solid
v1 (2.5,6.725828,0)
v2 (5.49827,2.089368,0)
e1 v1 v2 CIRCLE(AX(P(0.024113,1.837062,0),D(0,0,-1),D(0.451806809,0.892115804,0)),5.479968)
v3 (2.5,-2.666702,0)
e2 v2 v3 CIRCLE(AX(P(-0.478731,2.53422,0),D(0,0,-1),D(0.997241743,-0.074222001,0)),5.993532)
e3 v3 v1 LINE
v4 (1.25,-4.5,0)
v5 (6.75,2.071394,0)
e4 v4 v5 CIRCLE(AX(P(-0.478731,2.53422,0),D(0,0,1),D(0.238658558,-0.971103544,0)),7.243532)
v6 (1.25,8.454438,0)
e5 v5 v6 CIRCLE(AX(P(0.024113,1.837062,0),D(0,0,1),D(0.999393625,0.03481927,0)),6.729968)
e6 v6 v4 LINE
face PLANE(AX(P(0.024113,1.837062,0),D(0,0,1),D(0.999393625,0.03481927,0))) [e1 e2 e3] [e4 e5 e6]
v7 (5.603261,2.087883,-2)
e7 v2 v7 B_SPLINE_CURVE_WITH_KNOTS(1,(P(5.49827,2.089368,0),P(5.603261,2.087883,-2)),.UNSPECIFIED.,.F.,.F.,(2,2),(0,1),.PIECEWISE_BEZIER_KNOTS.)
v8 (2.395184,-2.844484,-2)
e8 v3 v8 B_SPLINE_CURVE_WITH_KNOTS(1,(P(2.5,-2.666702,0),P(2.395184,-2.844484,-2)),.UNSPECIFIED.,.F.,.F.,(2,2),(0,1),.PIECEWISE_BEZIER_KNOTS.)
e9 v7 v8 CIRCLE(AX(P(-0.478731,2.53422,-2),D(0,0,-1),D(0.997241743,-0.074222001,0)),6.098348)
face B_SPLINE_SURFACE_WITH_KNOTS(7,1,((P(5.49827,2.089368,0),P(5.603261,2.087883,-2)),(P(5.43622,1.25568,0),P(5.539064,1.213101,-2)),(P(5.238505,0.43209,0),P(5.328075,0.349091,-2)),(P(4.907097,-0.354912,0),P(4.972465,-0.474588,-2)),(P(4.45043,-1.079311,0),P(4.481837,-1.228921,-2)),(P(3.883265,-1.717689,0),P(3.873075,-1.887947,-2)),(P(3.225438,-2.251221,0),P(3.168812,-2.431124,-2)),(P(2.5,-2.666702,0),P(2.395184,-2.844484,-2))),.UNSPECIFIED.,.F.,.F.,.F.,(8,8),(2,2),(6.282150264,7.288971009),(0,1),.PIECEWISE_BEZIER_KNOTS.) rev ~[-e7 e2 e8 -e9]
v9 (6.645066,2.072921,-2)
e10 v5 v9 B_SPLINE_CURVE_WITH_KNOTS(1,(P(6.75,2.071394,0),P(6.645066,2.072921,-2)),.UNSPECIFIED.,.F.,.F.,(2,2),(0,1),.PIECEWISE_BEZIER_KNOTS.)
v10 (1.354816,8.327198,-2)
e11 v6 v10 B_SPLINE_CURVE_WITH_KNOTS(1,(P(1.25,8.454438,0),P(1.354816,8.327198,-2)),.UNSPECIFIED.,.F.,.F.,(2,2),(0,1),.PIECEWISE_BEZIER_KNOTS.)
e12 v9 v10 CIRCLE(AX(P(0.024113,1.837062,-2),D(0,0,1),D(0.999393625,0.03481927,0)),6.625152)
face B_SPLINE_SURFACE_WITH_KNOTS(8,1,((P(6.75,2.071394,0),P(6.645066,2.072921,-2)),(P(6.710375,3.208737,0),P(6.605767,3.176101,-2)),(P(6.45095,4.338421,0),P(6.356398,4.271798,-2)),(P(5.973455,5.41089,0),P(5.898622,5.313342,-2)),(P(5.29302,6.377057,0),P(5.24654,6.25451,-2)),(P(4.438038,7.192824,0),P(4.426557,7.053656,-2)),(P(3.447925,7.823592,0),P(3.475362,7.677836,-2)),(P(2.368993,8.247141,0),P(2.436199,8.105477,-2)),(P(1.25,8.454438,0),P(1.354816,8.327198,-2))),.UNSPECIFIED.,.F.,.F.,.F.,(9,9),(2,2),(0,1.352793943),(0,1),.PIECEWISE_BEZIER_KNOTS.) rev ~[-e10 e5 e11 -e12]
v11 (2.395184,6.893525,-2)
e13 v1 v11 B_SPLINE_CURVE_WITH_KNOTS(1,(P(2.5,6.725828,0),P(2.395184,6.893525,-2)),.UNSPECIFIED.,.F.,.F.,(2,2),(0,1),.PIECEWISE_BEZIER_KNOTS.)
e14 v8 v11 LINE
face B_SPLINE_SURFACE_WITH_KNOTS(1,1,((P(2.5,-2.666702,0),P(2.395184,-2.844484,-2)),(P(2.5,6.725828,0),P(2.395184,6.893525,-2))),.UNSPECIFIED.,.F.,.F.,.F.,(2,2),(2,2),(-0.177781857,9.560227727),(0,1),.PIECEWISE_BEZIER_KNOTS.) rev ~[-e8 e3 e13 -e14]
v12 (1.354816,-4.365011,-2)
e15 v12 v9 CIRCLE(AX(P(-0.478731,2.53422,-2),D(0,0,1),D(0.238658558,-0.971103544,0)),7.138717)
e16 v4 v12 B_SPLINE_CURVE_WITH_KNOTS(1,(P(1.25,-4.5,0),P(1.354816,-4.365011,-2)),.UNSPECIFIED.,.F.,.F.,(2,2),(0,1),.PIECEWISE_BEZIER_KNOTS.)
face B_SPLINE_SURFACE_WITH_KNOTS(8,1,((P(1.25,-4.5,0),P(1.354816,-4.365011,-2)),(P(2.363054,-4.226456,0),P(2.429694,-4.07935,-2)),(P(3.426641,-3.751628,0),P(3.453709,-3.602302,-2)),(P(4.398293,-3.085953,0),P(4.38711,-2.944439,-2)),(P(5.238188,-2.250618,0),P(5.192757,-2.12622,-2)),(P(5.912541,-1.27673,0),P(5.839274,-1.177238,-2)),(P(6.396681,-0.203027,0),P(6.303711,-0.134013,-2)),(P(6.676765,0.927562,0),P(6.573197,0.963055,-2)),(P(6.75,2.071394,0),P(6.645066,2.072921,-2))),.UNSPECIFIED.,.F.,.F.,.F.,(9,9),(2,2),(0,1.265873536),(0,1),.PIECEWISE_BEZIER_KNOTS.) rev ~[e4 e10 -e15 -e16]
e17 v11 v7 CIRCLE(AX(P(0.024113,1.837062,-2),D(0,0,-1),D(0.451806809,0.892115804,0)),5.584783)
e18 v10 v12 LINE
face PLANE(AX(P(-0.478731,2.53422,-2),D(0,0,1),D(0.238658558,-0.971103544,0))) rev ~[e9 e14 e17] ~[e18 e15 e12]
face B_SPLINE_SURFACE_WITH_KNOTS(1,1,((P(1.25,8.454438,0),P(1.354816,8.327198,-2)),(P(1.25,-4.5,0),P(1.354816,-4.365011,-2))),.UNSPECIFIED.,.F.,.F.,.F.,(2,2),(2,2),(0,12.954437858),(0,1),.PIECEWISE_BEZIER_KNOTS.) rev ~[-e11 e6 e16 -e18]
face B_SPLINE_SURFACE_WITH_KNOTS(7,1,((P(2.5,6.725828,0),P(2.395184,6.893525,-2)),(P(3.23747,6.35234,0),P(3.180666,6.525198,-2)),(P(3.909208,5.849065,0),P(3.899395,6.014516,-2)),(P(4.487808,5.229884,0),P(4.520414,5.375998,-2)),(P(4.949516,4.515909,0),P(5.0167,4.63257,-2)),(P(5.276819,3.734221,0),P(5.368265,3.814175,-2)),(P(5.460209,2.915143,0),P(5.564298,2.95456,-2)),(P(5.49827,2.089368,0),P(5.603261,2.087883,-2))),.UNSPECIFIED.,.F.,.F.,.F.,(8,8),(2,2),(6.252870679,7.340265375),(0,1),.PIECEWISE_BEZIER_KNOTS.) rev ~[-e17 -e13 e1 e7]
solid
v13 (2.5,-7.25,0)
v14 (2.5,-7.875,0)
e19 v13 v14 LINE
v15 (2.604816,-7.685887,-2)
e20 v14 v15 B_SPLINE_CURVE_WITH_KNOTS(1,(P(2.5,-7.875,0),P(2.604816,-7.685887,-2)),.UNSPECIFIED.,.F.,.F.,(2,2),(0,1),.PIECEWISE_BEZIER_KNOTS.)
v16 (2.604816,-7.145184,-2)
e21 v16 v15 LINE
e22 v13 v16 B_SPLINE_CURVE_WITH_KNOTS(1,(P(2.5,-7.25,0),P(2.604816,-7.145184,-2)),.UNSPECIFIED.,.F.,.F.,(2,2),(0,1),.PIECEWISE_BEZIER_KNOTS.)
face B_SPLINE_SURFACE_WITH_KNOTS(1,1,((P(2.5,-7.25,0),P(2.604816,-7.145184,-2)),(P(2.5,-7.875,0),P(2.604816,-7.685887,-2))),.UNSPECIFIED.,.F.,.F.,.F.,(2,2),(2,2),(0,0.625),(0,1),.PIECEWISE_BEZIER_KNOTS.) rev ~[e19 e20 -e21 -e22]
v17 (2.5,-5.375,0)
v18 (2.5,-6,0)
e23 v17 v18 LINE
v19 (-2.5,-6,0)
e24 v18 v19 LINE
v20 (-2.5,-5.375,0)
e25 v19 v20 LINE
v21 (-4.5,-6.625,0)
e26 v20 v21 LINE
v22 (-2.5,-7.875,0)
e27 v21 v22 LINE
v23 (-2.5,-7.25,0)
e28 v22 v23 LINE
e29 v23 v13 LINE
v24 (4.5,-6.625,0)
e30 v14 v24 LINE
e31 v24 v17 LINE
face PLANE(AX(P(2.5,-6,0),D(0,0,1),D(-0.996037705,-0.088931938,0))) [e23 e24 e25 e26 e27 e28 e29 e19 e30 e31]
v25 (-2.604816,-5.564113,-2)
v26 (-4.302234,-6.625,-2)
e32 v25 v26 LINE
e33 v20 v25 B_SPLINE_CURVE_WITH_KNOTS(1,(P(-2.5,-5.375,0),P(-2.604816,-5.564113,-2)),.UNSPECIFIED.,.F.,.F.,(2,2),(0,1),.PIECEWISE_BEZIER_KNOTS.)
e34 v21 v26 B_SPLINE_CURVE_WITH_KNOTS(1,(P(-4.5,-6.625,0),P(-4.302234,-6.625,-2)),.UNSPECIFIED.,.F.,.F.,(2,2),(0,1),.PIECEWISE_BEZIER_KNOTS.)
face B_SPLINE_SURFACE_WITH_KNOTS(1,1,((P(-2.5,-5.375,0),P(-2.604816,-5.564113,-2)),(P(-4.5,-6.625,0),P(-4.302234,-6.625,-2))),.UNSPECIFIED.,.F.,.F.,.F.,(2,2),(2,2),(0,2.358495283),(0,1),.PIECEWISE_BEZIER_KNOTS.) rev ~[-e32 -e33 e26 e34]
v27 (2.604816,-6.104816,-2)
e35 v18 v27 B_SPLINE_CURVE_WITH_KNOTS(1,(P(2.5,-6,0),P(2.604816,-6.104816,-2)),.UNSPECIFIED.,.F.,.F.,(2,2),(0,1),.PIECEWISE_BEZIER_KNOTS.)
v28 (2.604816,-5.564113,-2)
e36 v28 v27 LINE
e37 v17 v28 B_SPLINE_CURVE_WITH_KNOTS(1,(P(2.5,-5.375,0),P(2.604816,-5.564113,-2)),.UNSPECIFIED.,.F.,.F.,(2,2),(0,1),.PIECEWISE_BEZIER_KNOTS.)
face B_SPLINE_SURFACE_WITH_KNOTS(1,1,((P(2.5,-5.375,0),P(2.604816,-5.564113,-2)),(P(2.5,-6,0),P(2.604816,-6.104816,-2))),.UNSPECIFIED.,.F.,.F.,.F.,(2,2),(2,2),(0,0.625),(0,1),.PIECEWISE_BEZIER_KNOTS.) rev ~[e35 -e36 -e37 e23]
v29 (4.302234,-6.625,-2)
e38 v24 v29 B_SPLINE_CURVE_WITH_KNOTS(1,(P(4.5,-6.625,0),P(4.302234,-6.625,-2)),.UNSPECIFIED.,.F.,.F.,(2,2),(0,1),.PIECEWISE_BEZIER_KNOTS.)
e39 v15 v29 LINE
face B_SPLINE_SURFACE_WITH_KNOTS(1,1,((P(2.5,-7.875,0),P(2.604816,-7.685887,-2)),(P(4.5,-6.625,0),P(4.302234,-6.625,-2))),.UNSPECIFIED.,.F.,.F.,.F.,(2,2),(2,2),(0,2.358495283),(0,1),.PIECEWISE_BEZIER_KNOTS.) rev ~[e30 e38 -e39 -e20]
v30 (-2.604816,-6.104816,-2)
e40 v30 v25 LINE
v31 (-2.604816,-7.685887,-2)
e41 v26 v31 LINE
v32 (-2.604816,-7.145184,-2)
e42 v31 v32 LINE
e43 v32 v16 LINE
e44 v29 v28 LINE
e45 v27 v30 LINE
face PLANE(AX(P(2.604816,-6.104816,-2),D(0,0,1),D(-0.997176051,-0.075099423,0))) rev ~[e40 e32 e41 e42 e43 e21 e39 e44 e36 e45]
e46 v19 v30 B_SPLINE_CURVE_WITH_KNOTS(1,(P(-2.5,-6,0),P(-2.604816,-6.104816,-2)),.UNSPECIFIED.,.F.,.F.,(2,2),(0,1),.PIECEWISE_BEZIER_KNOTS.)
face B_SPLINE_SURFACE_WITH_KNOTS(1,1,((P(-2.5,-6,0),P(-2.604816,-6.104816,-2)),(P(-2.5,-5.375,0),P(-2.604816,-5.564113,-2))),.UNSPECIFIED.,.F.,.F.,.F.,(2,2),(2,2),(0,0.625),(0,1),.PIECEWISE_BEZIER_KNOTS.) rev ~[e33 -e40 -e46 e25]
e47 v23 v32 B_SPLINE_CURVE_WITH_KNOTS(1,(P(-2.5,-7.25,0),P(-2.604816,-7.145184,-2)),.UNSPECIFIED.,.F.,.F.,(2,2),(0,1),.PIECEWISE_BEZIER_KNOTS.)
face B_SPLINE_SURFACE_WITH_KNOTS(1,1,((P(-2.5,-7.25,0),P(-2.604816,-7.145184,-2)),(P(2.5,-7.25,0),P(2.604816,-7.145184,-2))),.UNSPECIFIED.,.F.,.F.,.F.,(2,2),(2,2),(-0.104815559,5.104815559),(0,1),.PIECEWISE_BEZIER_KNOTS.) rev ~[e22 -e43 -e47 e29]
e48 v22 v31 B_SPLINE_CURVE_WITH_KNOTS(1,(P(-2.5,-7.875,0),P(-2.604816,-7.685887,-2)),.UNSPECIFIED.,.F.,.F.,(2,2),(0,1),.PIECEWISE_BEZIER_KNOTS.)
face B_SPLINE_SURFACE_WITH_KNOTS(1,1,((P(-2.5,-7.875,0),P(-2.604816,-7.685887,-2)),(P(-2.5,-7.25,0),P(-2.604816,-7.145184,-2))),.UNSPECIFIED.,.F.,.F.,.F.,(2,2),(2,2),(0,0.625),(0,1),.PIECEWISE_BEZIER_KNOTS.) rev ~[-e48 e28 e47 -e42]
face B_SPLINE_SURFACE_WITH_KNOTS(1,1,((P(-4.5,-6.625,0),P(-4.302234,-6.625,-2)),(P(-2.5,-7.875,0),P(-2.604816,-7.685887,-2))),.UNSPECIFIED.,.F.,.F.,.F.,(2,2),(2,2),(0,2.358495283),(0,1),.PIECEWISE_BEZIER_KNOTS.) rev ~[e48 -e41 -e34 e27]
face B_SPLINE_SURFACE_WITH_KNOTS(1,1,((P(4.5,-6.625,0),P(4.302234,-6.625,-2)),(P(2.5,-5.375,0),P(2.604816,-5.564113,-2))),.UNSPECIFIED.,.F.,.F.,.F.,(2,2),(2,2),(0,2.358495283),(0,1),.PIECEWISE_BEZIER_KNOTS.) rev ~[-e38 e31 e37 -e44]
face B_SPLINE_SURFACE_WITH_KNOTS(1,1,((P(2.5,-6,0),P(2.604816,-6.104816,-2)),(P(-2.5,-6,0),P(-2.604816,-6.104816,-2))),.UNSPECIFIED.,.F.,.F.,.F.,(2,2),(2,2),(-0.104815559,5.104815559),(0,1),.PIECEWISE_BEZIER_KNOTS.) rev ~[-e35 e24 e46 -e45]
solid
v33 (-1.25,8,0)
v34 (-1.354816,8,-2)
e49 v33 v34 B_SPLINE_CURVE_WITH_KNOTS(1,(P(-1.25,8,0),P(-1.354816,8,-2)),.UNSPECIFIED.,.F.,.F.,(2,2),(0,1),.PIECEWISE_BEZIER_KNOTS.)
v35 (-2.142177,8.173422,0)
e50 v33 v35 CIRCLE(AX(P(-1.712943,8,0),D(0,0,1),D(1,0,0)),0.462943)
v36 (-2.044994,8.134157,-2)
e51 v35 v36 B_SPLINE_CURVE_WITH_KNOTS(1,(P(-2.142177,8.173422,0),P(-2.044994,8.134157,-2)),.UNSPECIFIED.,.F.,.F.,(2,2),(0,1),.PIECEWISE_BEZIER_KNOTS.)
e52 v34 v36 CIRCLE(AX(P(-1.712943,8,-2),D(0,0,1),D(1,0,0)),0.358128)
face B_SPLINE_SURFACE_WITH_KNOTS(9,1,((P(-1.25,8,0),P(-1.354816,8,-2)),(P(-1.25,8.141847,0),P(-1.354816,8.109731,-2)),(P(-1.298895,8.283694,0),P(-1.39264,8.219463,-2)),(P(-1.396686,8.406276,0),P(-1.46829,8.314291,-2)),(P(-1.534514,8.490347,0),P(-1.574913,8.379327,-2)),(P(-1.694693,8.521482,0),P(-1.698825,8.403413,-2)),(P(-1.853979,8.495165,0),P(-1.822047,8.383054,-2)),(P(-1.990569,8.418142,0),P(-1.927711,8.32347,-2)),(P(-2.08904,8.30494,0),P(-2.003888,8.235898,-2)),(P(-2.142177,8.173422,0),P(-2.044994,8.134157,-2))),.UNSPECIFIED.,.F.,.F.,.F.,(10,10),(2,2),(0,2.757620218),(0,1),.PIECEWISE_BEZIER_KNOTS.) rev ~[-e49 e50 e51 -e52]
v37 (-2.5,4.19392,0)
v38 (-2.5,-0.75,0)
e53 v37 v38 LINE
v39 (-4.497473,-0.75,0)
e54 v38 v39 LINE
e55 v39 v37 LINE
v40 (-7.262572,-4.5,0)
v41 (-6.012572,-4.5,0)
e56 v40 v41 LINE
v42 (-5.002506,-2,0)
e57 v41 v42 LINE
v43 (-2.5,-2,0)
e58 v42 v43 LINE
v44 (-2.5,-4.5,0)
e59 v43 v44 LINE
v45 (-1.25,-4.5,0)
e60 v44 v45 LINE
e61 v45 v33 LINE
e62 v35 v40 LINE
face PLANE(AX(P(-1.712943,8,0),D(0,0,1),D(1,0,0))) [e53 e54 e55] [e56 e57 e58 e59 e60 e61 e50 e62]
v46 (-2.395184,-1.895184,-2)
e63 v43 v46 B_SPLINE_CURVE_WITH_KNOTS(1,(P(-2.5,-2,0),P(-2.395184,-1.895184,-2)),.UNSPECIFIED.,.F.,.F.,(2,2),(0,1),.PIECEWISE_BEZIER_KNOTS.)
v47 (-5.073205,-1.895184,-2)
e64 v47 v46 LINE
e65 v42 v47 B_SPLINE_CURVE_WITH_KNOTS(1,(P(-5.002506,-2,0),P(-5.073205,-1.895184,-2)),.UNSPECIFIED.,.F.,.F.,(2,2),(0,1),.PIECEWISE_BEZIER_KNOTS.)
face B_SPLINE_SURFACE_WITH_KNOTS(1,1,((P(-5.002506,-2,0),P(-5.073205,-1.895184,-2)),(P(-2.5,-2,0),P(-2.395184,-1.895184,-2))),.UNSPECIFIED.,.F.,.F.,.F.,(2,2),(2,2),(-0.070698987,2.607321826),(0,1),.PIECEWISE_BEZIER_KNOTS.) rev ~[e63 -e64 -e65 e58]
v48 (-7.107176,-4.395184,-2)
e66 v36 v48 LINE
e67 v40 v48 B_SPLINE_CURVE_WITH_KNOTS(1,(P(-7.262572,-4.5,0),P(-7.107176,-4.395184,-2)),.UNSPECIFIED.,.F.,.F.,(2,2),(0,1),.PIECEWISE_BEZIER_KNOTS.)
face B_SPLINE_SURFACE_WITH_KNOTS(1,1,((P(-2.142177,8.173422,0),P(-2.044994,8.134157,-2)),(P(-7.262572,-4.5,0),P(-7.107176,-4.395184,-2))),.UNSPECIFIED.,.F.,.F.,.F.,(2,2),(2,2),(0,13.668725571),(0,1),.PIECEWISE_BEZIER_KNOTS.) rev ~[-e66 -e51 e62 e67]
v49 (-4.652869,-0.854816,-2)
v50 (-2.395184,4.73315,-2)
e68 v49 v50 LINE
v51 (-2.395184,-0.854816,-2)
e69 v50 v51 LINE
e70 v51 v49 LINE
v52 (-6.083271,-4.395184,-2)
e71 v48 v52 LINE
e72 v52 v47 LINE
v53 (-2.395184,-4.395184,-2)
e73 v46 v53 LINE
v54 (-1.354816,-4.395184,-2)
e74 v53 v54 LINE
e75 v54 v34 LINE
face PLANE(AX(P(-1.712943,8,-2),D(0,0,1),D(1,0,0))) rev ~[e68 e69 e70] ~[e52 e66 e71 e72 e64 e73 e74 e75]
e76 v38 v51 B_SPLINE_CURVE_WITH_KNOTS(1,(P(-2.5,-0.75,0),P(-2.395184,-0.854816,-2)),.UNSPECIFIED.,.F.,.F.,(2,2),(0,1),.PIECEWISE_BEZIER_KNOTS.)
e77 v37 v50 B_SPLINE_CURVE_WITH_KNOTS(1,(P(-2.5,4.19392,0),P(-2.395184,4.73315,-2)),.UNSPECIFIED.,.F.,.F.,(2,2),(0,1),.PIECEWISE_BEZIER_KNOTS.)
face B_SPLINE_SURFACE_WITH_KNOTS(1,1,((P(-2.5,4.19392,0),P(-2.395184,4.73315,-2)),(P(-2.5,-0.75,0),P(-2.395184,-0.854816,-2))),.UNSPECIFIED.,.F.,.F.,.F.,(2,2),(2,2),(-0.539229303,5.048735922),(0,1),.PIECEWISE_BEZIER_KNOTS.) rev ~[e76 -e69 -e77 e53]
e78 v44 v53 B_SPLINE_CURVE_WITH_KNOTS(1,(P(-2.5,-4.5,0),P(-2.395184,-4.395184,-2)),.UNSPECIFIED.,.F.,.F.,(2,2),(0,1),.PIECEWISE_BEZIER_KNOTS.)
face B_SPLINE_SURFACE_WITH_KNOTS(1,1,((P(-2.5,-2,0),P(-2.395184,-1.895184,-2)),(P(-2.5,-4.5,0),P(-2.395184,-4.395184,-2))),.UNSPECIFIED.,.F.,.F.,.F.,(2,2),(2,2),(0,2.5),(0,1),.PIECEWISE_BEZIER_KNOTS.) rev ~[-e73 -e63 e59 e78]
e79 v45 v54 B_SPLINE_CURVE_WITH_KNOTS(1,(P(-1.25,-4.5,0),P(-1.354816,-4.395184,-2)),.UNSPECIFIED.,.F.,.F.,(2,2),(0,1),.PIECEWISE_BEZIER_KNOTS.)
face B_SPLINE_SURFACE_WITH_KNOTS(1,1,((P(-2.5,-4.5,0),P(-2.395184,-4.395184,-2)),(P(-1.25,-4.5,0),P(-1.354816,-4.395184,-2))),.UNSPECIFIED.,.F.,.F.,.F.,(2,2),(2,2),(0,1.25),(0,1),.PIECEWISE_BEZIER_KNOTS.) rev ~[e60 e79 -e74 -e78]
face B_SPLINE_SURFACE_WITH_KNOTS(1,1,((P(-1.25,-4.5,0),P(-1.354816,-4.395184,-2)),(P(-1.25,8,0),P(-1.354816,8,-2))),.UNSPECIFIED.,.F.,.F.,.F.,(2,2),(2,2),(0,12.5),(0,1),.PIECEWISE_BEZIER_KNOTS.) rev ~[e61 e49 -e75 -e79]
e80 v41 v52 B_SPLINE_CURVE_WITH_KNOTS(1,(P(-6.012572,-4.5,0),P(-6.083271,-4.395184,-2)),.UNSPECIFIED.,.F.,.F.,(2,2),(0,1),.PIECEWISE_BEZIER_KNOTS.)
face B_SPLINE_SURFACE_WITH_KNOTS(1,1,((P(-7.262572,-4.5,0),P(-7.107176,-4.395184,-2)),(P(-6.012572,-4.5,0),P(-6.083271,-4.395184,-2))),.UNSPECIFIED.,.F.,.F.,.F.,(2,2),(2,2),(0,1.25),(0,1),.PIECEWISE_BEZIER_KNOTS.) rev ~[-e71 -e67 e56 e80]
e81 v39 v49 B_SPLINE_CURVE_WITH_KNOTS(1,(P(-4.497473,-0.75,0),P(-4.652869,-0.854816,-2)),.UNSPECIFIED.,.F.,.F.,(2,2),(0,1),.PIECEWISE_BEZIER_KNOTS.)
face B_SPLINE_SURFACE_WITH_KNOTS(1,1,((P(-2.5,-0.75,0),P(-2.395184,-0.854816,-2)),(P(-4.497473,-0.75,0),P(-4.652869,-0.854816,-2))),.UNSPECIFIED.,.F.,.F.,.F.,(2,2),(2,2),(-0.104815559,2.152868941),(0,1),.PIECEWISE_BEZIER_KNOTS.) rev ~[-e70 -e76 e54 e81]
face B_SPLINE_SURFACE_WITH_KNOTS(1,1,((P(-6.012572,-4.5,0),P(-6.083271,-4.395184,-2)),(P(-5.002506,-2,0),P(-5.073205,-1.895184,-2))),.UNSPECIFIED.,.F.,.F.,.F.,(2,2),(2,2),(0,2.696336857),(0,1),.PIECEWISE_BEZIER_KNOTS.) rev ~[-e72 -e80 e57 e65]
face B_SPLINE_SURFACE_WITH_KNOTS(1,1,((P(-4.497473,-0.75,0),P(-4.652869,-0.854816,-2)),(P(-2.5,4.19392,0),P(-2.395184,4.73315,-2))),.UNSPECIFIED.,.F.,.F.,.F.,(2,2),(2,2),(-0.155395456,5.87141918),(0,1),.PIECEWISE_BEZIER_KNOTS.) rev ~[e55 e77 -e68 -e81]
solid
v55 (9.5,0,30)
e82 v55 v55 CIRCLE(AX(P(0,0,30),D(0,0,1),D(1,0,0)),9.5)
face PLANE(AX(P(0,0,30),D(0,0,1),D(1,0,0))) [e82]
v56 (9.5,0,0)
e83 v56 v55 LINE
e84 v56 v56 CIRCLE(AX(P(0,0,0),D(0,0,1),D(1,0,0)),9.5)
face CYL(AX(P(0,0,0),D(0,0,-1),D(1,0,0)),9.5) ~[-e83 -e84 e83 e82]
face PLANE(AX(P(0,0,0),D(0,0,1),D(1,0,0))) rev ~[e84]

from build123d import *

# Parameters (mm, degrees)
F1_DEPTH = 2
F1_TAPER = 3
F0_R     = 9.5
F2_DEPTH = 30


with BuildPart() as f1:
    # F0 (on Top) → F1 (new body)
    with BuildSketch(Plane.XY):
        with BuildLine():
            Line((-2.5, -4.5), (-1.25, -4.5))
            Line((-1.25, -4.5), (-1.25, 8))
            ThreePointArc((-1.25, 8), (-1.6246096615, 8.4544378581), (-2.1421771094, 8.1734216623))
            Line((-2.1421771094, 8.1734216623), (-7.2625718321, -4.5))
            Line((-7.2625718321, -4.5), (-6.0125718321, -4.5))
            Line((-6.0125718321, -4.5), (-5.0025062675, -2))
            Line((-5.0025062675, -2), (-2.5, -2))
            Line((-2.5, -2), (-2.5, -4.5))
        make_face()
        Polygon((-2.5, -0.75), (-4.4974734852, -0.75), (-2.5, 4.1939203632), align=None, mode=Mode.SUBTRACT)
    extrude(amount=-F1_DEPTH, taper=F1_TAPER)


with BuildPart() as f1b:
    # F0 (on Top) → F1, piece 2 (new body)
    with BuildSketch(Plane.XY):
        with BuildLine():
            Line((1.25, 8.4544378581), (1.25, -4.5))
            ThreePointArc((1.25, -4.5), (5.075982109, -2.1148576985), (6.75, 2.0713944437))
            ThreePointArc((6.75, 2.0713944437), (5.1224940234, 6.2301220319), (1.25, 8.4544378581))
        make_face()
        with BuildLine():
            ThreePointArc((2.5, 6.7258275142), (4.6257418552, 4.8128070407), (5.4982695285, 2.0893678132))
            ThreePointArc((5.4982695285, 2.0893678132), (4.5914102703, -0.6620430511), (2.5, -2.6667022589))
            Line((2.5, -2.6667022589), (2.5, 6.7258275142))
        make_face(mode=Mode.SUBTRACT)
    extrude(amount=-F1_DEPTH, taper=F1_TAPER)


with BuildPart() as f1c:
    # F0 (on Top) → F1, piece 3 (new body)
    with BuildSketch(Plane.XY):
        Polygon((2.5, -6), (-2.5, -6), (-2.5, -5.375), (-4.5, -6.625), (-2.5, -7.875), (-2.5, -7.25), (2.5, -7.25), (2.5, -7.875), (4.5, -6.625), (2.5, -5.375), align=None)
    extrude(amount=-F1_DEPTH, taper=F1_TAPER)


with BuildPart() as f2:
    # F0 (on Top) → F2 (new body)
    with BuildSketch(Plane.XY):
        Circle(F0_R)
        Polygon((-2.5, -5.375), (-2.5, -6), (2.5, -6), (2.5, -5.375), (4.5, -6.625), (2.5, -7.875), (2.5, -7.25), (-2.5, -7.25), (-2.5, -7.875), (-4.5, -6.625), align=None, mode=Mode.SUBTRACT)
        with BuildLine():
            Line((-1.25, 8), (-1.25, -4.5))
            Line((-1.25, -4.5), (-2.5, -4.5))
            Line((-2.5, -4.5), (-2.5, -2))
            Line((-2.5, -2), (-5.0025062675, -2))
            Line((-5.0025062675, -2), (-6.0125718321, -4.5))
            Line((-6.0125718321, -4.5), (-7.2625718321, -4.5))
            Line((-7.2625718321, -4.5), (-2.1421771094, 8.1734216623))
            ThreePointArc((-2.1421771094, 8.1734216623), (-1.6246096615, 8.4544378581), (-1.25, 8))
        make_face(mode=Mode.SUBTRACT)
        with BuildLine():
            ThreePointArc((6.75, 2.0713944437), (5.075982109, -2.1148576985), (1.25, -4.5))
            Line((1.25, -4.5), (1.25, 8.4544378581))
            ThreePointArc((1.25, 8.4544378581), (5.1224940234, 6.2301220319), (6.75, 2.0713944437))
        make_face(mode=Mode.SUBTRACT)
        with BuildLine():
            Line((1.25, 8.4544378581), (1.25, -4.5))
            ThreePointArc((1.25, -4.5), (5.075982109, -2.1148576985), (6.75, 2.0713944437))
            ThreePointArc((6.75, 2.0713944437), (5.1224940234, 6.2301220319), (1.25, 8.4544378581))
        make_face()
        with BuildLine():
            ThreePointArc((2.5, 6.7258275142), (4.6257418552, 4.8128070407), (5.4982695285, 2.0893678132))
            ThreePointArc((5.4982695285, 2.0893678132), (4.5914102703, -0.6620430511), (2.5, -2.6667022589))
            Line((2.5, -2.6667022589), (2.5, 6.7258275142))
        make_face(mode=Mode.SUBTRACT)
        with BuildLine():
            Line((-2.5, -4.5), (-1.25, -4.5))
            Line((-1.25, -4.5), (-1.25, 8))
            ThreePointArc((-1.25, 8), (-1.6246096615, 8.4544378581), (-2.1421771094, 8.1734216623))
            Line((-2.1421771094, 8.1734216623), (-7.2625718321, -4.5))
            Line((-7.2625718321, -4.5), (-6.0125718321, -4.5))
            Line((-6.0125718321, -4.5), (-5.0025062675, -2))
            Line((-5.0025062675, -2), (-2.5, -2))
            Line((-2.5, -2), (-2.5, -4.5))
        make_face()
        Polygon((-2.5, -0.75), (-4.4974734852, -0.75), (-2.5, 4.1939203632), align=None, mode=Mode.SUBTRACT)
        with BuildLine():
            ThreePointArc((2.5, -2.6667022589), (4.5914102703, -0.6620430511), (5.4982695285, 2.0893678132))
            ThreePointArc((5.4982695285, 2.0893678132), (4.6257418552, 4.8128070407), (2.5, 6.7258275142))
            Line((2.5, 6.7258275142), (2.5, -2.6667022589))
        make_face()
        Polygon((2.5, -6), (-2.5, -6), (-2.5, -5.375), (-4.5, -6.625), (-2.5, -7.875), (-2.5, -7.25), (2.5, -7.25), (2.5, -7.875), (4.5, -6.625), (2.5, -5.375), align=None)
        Polygon((-2.5, 4.1939203632), (-4.4974734852, -0.75), (-2.5, -0.75), align=None)
    extrude(amount=F2_DEPTH)


solid = Compound([f1.part, f1b.part, f1c.part, f2.part])
